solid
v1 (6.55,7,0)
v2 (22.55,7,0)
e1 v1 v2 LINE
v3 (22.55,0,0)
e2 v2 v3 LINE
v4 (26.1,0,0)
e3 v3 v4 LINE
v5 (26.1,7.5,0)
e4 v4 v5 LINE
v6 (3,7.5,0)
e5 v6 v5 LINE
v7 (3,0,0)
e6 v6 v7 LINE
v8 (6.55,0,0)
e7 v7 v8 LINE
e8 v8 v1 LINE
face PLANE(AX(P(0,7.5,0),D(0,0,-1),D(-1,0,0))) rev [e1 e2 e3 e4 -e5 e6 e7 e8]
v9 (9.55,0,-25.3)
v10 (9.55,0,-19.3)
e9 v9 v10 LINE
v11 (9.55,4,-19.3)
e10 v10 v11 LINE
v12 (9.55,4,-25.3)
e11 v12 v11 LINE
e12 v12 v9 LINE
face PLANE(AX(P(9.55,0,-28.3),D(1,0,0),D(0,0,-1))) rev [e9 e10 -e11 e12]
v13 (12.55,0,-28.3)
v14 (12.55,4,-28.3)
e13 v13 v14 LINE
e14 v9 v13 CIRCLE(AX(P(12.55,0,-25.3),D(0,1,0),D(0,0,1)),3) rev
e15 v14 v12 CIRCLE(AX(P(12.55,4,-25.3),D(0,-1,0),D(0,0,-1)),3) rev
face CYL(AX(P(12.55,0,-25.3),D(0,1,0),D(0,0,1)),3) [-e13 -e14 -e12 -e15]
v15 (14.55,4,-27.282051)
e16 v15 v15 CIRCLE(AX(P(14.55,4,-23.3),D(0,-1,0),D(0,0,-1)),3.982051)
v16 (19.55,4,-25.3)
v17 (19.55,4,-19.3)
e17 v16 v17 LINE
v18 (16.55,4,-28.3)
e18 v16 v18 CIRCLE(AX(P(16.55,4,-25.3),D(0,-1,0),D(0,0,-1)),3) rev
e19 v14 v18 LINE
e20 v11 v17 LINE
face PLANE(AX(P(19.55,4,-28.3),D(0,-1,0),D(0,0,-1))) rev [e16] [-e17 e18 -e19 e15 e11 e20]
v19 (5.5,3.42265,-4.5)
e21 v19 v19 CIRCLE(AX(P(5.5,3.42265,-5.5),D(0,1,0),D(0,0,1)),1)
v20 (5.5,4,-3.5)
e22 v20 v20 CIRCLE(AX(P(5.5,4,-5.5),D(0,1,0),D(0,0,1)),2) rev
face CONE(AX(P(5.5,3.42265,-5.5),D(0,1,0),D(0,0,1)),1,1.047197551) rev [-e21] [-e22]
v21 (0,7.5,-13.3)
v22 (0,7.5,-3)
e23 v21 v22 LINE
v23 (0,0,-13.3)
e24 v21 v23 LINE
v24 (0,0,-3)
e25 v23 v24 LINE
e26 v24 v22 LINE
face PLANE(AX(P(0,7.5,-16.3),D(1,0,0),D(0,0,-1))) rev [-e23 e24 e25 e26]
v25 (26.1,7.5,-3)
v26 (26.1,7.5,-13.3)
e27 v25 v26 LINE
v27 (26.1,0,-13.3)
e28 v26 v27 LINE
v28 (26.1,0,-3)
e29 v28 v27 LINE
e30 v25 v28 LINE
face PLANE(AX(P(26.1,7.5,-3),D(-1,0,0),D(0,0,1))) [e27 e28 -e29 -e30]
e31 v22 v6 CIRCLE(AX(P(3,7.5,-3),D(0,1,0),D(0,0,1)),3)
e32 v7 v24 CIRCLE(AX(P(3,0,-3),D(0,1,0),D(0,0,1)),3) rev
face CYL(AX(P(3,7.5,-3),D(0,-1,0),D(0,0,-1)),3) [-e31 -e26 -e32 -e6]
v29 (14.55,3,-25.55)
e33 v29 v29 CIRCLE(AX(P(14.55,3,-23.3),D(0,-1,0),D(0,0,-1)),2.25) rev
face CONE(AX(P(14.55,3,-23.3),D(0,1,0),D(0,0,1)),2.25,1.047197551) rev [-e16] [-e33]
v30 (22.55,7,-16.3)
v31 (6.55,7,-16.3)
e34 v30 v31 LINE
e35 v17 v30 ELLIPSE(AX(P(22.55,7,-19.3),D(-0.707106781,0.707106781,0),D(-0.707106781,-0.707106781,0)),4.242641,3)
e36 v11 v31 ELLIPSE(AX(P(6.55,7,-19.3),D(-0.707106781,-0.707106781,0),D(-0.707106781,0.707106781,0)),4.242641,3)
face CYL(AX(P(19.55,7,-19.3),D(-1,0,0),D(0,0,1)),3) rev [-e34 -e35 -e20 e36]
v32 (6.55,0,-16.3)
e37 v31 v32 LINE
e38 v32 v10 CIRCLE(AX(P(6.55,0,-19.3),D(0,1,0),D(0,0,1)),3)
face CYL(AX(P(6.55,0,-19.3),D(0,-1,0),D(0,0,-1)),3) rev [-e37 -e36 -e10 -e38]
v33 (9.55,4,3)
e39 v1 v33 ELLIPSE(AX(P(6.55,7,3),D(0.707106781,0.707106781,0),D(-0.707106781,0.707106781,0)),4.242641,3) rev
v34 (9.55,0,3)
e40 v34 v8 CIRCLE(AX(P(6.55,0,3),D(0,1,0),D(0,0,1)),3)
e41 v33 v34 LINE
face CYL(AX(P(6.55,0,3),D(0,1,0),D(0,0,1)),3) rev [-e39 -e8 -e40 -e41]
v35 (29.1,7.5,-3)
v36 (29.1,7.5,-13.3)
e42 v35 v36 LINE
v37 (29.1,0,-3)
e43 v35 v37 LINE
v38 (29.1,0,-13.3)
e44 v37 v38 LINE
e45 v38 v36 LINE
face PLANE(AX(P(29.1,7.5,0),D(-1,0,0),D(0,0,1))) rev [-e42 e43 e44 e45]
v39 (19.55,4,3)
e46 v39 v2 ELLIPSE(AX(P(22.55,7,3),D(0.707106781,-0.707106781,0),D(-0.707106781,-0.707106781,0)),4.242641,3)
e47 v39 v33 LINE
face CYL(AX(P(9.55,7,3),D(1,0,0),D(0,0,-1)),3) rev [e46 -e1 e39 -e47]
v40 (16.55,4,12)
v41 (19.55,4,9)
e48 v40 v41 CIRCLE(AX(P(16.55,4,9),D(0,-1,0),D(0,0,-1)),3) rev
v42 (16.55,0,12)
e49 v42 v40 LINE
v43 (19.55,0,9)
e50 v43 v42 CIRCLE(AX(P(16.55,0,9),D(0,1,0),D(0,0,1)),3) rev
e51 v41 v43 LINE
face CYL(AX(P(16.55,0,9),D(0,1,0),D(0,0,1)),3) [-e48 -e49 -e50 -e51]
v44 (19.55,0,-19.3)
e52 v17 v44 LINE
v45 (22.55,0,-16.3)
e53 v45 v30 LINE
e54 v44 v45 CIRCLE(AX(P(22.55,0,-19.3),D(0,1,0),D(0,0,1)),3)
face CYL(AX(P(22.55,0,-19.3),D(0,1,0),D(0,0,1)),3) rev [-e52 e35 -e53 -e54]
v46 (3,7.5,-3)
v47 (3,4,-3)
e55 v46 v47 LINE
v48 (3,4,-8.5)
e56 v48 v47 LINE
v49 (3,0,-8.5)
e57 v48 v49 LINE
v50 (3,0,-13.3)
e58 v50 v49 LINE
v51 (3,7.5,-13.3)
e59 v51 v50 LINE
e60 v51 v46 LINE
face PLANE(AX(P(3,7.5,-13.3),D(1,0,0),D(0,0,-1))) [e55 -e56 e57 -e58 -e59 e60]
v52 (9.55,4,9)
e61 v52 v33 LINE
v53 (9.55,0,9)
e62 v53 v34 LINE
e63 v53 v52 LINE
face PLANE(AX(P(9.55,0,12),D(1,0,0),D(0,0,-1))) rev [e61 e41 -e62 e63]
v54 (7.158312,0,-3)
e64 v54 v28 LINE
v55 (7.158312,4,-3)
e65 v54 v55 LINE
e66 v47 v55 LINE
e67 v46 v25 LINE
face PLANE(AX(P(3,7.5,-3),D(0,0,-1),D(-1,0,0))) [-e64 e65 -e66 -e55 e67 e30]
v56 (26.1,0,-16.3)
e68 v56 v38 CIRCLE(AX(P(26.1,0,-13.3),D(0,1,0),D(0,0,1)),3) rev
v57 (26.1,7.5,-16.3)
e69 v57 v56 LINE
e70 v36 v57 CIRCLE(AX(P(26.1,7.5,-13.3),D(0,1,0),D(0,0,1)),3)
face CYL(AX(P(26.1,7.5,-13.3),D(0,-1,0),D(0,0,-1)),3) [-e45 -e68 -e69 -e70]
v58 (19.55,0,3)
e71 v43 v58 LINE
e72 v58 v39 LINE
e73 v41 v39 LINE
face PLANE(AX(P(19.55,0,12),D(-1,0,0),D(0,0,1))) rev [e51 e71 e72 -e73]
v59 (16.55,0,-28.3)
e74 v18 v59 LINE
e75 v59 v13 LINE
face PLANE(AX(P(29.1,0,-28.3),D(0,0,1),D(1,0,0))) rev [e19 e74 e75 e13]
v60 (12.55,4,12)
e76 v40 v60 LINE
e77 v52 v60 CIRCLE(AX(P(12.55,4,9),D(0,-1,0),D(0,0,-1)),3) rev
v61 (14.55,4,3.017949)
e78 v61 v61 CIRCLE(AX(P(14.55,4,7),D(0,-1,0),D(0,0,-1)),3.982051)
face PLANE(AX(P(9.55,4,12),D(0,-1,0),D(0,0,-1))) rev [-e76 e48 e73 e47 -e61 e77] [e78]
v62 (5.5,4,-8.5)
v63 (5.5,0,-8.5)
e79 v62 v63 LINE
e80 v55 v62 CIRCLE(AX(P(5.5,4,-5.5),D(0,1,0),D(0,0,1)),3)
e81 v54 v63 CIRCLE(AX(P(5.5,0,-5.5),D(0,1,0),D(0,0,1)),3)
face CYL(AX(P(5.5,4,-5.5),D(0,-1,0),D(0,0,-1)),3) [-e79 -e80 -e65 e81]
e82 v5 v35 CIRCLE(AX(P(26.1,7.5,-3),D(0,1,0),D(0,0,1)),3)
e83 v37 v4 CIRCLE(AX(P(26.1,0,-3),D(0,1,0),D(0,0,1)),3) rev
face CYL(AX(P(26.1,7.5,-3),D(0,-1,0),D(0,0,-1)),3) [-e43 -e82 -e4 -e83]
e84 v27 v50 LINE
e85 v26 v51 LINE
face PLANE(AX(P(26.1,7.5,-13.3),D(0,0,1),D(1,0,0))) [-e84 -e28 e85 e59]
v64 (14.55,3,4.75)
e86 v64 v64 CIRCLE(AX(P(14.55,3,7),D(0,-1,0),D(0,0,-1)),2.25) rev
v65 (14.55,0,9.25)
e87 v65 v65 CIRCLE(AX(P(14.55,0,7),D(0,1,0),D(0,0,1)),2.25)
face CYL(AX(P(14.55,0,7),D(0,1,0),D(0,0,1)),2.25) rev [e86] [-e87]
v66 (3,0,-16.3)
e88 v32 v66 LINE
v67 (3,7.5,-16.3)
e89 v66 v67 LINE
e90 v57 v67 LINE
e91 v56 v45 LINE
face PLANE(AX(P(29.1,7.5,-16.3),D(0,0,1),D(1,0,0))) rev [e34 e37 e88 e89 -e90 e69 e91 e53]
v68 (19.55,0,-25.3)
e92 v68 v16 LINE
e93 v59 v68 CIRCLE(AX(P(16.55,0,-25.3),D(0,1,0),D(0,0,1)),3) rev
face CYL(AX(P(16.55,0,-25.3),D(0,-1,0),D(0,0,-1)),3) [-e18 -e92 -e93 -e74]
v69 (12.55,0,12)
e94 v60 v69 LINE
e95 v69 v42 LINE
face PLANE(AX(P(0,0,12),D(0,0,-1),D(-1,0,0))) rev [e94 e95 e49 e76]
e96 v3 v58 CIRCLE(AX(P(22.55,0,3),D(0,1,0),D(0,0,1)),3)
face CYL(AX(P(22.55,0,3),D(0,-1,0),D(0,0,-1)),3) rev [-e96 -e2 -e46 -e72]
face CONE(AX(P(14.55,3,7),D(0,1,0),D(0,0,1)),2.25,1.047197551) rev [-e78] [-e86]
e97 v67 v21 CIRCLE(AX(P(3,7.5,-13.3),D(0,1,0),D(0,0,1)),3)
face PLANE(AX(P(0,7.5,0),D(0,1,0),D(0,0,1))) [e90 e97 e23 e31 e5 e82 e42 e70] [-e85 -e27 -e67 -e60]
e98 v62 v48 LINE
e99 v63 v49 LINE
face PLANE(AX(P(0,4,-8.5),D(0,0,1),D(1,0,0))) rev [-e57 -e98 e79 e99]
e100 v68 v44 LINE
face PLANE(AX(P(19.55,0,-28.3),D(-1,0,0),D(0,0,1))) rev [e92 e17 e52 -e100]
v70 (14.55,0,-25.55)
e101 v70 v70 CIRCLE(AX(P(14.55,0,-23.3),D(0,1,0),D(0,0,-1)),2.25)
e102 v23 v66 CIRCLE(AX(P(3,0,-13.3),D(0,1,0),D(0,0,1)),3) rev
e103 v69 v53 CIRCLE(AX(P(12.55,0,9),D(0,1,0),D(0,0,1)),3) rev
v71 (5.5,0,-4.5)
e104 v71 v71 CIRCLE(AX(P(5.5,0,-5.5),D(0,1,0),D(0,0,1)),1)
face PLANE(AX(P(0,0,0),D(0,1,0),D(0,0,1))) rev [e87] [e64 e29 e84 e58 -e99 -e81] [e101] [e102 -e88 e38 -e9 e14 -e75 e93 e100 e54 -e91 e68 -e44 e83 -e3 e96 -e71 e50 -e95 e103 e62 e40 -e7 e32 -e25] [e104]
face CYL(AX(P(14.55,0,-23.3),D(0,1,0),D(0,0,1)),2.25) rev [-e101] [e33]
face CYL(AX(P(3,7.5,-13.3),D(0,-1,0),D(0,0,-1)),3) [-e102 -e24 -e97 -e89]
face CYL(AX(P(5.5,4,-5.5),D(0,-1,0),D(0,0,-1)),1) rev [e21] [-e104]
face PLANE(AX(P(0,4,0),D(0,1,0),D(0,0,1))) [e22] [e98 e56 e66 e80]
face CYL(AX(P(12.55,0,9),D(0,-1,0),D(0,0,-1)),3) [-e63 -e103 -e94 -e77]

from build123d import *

# Parameters (mm, degrees)
SKETCH5_W             = 29.1
SKETCH5_H             = 16.3
SKETCH5_W_2           = 23.1
SKETCH5_H_2           = 10.3
BOSS_EXTRUDE3_DEPTH   = 7.5
FILLET1_R             = 3
SKETCH7_R             = 1
BOSS_EXTRUDE5_DEPTH   = 4
SKETCH11_W            = 10
SKETCH11_H            = 4
BOSS_EXTRUDE6_DEPTH   = 12
FILLET3_R             = 3
SKETCH13_R            = 2.25
CUT_EXTRUDE1_DEPTH    = 34.593154064
CHAMFER2_SIZE         = 1
CHAMFER2_SIZE2        = 1.732050808
CIRPATTERN1_OUTLINE_R = 2.25
CIRPATTERN1_DEPTH     = 2.9999999
CIRPATTERN1_START     = 2.9999999
CIRPATTERN1_2_DEPTH   = 1.0000001
FILLET5_R             = 3
CHAMFER3_SIZE         = 1
CHAMFER3_SIZE2        = 0.577350269


with BuildPart() as part:
    # Sketch5 → Boss-Extrude3 (new body)
    with BuildSketch(Plane(origin=(0, 0, 0), x_dir=(1, 0, 0), z_dir=(0, 1, 0))):
        with Locations((14.55, 8.15)):
            Rectangle(SKETCH5_W, SKETCH5_H)
        with Locations((14.55, 8.15)):
            Rectangle(SKETCH5_W_2, SKETCH5_H_2, mode=Mode.SUBTRACT)
    extrude(amount=BOSS_EXTRUDE3_DEPTH)

    # Fillet1
    fillet1_edges = [part.edges().sort_by_distance(p)[0] for p in [
        (29.1, 3.75, -16.3),
        (29.1, 3.75, 0),
        (0, 3.75, 0),
        (0, 3.75, -16.3),
    ]]
    fillet(fillet1_edges, radius=FILLET1_R)

    # Sketch7 → Boss-Extrude5 (add)
    with BuildSketch(Plane(origin=(0, 0, 0), x_dir=(1, 0, 0), z_dir=(0, 1, 0))):
        with BuildLine():
            Line((5.5, 8.5), (3, 8.5))
            Line((3, 8.5), (3, 2.5))
            Line((3, 2.5), (5.5, 2.5))
            ThreePointArc((5.5, 2.5), (8.5, 5.5), (5.5, 8.5))
        make_face()
        with Locations(Location((5.5, 5.5, 0), (0, 0, 270))):
            Circle(SKETCH7_R, mode=Mode.SUBTRACT)
    extrude(amount=BOSS_EXTRUDE5_DEPTH)

    # Sketch11 → Boss-Extrude6 (add)
    with BuildSketch(Plane.XY):
        with Locations((14.55, 2)):
            Rectangle(SKETCH11_W, SKETCH11_H)
    extrude(amount=BOSS_EXTRUDE6_DEPTH)

    # Fillet3
    fillet3_edges = [part.edges().sort_by_distance(p)[0] for p in [
        (9.55, 2, 0),
        (19.55, 2, 0),
        (14.55, 4, 0),
        (9.55, 2, 12),
        (19.55, 2, 12),
    ]]
    fillet(fillet3_edges, radius=FILLET3_R)

    # Sketch13 → Cut-Extrude1 (cut, through all)
    with BuildSketch(Plane(origin=(0, 4, 0), x_dir=(1, 0, 0), z_dir=(0, 1, 0))):
        with Locations(Location((14.55, -7, 0), (0, 0, 270))):
            Circle(SKETCH13_R)
    extrude(amount=-CUT_EXTRUDE1_DEPTH, mode=Mode.SUBTRACT)

    # Chamfer2
    chamfer2_edges = [part.edges().sort_by_distance(p)[0] for p in [
        (14.55, 4, 4.75),
    ]]
    chamfer2_side = [part.faces().sort_by_distance(p)[0] for p in [
        (14.55, 2, 4.75),
    ]]
    chamfer(chamfer2_edges, length=CHAMFER2_SIZE, length2=CHAMFER2_SIZE2, reference=chamfer2_side[0])

    # CirPattern1: read off the stored shape, not the designer's step
    # CirPattern1 outline → CirPattern1 (add)
    with BuildSketch(Plane(origin=(0, 0, 0), x_dir=(1, 0, 0), z_dir=(0, 1, 0))):
        with BuildLine():
            Line((9.55, 25.3), (9.55, 16.3))
            Line((9.55, 16.3), (19.55, 16.3))
            Line((19.55, 16.3), (19.55, 25.3))
            ThreePointArc((19.55, 25.3), (18.671320344, 27.421320344), (16.55, 28.3))
            Line((16.55, 28.3), (12.55, 28.3))
            ThreePointArc((12.55, 28.3), (10.428679656, 27.421320344), (9.55, 25.3))
        make_face()
        with Locations((14.55, 23.3)):
            Circle(CIRPATTERN1_OUTLINE_R, mode=Mode.SUBTRACT)
    extrude(amount=CIRPATTERN1_DEPTH)

    # CirPattern1 2 outline → CirPattern1 2 (add)
    with BuildSketch(Plane(origin=(0, 0, 0), x_dir=(1, 0, 0), z_dir=(0, 1, 0)).offset(CIRPATTERN1_START)):
        with BuildLine():
            Line((9.55, 25.3), (9.55, 16.3))
            Line((9.55, 16.3), (19.55, 16.3))
            Line((19.55, 16.3), (19.55, 25.3))
            ThreePointArc((19.55, 25.3), (18.671320344, 27.421320344), (16.55, 28.3))
            Line((16.55, 28.3), (12.55, 28.3))
            ThreePointArc((12.55, 28.3), (10.428679656, 27.421320344), (9.55, 25.3))
        make_face()
    extrude(amount=CIRPATTERN1_2_DEPTH)

    # CirPattern1 3 outline → CirPattern1 3 (revolve, cut)
    with BuildSketch(Plane(origin=(14.55, 0, -23.3), x_dir=(1, 0, 0), z_dir=(0, 0, 1))):
        Polygon((0, 2.9999999), (2.25, 2.9999999), (3.982050808, 4), (0, 4), align=None)
    revolve(axis=Axis((14.55, 0, -23.3), (0, 1, 0)), mode=Mode.SUBTRACT)

    # Fillet5
    fillet5_edges = [part.edges().sort_by_distance(p)[0] for p in [
        (19.55, 2, -16.3),
        (9.55, 2, -16.3),
        (14.55, 4, -16.3),
    ]]
    fillet(fillet5_edges, radius=FILLET5_R)

    # Chamfer3
    chamfer3_edges = [part.edges().sort_by_distance(p)[0] for p in [
        (5.5, 4, -6.5),
    ]]
    chamfer3_side = [part.faces().sort_by_distance(p)[0] for p in [
        (8.297810971, 4, -6.343571748),
    ]]
    chamfer(chamfer3_edges, length=CHAMFER3_SIZE, length2=CHAMFER3_SIZE2, reference=chamfer3_side[0])


solid = part.part
